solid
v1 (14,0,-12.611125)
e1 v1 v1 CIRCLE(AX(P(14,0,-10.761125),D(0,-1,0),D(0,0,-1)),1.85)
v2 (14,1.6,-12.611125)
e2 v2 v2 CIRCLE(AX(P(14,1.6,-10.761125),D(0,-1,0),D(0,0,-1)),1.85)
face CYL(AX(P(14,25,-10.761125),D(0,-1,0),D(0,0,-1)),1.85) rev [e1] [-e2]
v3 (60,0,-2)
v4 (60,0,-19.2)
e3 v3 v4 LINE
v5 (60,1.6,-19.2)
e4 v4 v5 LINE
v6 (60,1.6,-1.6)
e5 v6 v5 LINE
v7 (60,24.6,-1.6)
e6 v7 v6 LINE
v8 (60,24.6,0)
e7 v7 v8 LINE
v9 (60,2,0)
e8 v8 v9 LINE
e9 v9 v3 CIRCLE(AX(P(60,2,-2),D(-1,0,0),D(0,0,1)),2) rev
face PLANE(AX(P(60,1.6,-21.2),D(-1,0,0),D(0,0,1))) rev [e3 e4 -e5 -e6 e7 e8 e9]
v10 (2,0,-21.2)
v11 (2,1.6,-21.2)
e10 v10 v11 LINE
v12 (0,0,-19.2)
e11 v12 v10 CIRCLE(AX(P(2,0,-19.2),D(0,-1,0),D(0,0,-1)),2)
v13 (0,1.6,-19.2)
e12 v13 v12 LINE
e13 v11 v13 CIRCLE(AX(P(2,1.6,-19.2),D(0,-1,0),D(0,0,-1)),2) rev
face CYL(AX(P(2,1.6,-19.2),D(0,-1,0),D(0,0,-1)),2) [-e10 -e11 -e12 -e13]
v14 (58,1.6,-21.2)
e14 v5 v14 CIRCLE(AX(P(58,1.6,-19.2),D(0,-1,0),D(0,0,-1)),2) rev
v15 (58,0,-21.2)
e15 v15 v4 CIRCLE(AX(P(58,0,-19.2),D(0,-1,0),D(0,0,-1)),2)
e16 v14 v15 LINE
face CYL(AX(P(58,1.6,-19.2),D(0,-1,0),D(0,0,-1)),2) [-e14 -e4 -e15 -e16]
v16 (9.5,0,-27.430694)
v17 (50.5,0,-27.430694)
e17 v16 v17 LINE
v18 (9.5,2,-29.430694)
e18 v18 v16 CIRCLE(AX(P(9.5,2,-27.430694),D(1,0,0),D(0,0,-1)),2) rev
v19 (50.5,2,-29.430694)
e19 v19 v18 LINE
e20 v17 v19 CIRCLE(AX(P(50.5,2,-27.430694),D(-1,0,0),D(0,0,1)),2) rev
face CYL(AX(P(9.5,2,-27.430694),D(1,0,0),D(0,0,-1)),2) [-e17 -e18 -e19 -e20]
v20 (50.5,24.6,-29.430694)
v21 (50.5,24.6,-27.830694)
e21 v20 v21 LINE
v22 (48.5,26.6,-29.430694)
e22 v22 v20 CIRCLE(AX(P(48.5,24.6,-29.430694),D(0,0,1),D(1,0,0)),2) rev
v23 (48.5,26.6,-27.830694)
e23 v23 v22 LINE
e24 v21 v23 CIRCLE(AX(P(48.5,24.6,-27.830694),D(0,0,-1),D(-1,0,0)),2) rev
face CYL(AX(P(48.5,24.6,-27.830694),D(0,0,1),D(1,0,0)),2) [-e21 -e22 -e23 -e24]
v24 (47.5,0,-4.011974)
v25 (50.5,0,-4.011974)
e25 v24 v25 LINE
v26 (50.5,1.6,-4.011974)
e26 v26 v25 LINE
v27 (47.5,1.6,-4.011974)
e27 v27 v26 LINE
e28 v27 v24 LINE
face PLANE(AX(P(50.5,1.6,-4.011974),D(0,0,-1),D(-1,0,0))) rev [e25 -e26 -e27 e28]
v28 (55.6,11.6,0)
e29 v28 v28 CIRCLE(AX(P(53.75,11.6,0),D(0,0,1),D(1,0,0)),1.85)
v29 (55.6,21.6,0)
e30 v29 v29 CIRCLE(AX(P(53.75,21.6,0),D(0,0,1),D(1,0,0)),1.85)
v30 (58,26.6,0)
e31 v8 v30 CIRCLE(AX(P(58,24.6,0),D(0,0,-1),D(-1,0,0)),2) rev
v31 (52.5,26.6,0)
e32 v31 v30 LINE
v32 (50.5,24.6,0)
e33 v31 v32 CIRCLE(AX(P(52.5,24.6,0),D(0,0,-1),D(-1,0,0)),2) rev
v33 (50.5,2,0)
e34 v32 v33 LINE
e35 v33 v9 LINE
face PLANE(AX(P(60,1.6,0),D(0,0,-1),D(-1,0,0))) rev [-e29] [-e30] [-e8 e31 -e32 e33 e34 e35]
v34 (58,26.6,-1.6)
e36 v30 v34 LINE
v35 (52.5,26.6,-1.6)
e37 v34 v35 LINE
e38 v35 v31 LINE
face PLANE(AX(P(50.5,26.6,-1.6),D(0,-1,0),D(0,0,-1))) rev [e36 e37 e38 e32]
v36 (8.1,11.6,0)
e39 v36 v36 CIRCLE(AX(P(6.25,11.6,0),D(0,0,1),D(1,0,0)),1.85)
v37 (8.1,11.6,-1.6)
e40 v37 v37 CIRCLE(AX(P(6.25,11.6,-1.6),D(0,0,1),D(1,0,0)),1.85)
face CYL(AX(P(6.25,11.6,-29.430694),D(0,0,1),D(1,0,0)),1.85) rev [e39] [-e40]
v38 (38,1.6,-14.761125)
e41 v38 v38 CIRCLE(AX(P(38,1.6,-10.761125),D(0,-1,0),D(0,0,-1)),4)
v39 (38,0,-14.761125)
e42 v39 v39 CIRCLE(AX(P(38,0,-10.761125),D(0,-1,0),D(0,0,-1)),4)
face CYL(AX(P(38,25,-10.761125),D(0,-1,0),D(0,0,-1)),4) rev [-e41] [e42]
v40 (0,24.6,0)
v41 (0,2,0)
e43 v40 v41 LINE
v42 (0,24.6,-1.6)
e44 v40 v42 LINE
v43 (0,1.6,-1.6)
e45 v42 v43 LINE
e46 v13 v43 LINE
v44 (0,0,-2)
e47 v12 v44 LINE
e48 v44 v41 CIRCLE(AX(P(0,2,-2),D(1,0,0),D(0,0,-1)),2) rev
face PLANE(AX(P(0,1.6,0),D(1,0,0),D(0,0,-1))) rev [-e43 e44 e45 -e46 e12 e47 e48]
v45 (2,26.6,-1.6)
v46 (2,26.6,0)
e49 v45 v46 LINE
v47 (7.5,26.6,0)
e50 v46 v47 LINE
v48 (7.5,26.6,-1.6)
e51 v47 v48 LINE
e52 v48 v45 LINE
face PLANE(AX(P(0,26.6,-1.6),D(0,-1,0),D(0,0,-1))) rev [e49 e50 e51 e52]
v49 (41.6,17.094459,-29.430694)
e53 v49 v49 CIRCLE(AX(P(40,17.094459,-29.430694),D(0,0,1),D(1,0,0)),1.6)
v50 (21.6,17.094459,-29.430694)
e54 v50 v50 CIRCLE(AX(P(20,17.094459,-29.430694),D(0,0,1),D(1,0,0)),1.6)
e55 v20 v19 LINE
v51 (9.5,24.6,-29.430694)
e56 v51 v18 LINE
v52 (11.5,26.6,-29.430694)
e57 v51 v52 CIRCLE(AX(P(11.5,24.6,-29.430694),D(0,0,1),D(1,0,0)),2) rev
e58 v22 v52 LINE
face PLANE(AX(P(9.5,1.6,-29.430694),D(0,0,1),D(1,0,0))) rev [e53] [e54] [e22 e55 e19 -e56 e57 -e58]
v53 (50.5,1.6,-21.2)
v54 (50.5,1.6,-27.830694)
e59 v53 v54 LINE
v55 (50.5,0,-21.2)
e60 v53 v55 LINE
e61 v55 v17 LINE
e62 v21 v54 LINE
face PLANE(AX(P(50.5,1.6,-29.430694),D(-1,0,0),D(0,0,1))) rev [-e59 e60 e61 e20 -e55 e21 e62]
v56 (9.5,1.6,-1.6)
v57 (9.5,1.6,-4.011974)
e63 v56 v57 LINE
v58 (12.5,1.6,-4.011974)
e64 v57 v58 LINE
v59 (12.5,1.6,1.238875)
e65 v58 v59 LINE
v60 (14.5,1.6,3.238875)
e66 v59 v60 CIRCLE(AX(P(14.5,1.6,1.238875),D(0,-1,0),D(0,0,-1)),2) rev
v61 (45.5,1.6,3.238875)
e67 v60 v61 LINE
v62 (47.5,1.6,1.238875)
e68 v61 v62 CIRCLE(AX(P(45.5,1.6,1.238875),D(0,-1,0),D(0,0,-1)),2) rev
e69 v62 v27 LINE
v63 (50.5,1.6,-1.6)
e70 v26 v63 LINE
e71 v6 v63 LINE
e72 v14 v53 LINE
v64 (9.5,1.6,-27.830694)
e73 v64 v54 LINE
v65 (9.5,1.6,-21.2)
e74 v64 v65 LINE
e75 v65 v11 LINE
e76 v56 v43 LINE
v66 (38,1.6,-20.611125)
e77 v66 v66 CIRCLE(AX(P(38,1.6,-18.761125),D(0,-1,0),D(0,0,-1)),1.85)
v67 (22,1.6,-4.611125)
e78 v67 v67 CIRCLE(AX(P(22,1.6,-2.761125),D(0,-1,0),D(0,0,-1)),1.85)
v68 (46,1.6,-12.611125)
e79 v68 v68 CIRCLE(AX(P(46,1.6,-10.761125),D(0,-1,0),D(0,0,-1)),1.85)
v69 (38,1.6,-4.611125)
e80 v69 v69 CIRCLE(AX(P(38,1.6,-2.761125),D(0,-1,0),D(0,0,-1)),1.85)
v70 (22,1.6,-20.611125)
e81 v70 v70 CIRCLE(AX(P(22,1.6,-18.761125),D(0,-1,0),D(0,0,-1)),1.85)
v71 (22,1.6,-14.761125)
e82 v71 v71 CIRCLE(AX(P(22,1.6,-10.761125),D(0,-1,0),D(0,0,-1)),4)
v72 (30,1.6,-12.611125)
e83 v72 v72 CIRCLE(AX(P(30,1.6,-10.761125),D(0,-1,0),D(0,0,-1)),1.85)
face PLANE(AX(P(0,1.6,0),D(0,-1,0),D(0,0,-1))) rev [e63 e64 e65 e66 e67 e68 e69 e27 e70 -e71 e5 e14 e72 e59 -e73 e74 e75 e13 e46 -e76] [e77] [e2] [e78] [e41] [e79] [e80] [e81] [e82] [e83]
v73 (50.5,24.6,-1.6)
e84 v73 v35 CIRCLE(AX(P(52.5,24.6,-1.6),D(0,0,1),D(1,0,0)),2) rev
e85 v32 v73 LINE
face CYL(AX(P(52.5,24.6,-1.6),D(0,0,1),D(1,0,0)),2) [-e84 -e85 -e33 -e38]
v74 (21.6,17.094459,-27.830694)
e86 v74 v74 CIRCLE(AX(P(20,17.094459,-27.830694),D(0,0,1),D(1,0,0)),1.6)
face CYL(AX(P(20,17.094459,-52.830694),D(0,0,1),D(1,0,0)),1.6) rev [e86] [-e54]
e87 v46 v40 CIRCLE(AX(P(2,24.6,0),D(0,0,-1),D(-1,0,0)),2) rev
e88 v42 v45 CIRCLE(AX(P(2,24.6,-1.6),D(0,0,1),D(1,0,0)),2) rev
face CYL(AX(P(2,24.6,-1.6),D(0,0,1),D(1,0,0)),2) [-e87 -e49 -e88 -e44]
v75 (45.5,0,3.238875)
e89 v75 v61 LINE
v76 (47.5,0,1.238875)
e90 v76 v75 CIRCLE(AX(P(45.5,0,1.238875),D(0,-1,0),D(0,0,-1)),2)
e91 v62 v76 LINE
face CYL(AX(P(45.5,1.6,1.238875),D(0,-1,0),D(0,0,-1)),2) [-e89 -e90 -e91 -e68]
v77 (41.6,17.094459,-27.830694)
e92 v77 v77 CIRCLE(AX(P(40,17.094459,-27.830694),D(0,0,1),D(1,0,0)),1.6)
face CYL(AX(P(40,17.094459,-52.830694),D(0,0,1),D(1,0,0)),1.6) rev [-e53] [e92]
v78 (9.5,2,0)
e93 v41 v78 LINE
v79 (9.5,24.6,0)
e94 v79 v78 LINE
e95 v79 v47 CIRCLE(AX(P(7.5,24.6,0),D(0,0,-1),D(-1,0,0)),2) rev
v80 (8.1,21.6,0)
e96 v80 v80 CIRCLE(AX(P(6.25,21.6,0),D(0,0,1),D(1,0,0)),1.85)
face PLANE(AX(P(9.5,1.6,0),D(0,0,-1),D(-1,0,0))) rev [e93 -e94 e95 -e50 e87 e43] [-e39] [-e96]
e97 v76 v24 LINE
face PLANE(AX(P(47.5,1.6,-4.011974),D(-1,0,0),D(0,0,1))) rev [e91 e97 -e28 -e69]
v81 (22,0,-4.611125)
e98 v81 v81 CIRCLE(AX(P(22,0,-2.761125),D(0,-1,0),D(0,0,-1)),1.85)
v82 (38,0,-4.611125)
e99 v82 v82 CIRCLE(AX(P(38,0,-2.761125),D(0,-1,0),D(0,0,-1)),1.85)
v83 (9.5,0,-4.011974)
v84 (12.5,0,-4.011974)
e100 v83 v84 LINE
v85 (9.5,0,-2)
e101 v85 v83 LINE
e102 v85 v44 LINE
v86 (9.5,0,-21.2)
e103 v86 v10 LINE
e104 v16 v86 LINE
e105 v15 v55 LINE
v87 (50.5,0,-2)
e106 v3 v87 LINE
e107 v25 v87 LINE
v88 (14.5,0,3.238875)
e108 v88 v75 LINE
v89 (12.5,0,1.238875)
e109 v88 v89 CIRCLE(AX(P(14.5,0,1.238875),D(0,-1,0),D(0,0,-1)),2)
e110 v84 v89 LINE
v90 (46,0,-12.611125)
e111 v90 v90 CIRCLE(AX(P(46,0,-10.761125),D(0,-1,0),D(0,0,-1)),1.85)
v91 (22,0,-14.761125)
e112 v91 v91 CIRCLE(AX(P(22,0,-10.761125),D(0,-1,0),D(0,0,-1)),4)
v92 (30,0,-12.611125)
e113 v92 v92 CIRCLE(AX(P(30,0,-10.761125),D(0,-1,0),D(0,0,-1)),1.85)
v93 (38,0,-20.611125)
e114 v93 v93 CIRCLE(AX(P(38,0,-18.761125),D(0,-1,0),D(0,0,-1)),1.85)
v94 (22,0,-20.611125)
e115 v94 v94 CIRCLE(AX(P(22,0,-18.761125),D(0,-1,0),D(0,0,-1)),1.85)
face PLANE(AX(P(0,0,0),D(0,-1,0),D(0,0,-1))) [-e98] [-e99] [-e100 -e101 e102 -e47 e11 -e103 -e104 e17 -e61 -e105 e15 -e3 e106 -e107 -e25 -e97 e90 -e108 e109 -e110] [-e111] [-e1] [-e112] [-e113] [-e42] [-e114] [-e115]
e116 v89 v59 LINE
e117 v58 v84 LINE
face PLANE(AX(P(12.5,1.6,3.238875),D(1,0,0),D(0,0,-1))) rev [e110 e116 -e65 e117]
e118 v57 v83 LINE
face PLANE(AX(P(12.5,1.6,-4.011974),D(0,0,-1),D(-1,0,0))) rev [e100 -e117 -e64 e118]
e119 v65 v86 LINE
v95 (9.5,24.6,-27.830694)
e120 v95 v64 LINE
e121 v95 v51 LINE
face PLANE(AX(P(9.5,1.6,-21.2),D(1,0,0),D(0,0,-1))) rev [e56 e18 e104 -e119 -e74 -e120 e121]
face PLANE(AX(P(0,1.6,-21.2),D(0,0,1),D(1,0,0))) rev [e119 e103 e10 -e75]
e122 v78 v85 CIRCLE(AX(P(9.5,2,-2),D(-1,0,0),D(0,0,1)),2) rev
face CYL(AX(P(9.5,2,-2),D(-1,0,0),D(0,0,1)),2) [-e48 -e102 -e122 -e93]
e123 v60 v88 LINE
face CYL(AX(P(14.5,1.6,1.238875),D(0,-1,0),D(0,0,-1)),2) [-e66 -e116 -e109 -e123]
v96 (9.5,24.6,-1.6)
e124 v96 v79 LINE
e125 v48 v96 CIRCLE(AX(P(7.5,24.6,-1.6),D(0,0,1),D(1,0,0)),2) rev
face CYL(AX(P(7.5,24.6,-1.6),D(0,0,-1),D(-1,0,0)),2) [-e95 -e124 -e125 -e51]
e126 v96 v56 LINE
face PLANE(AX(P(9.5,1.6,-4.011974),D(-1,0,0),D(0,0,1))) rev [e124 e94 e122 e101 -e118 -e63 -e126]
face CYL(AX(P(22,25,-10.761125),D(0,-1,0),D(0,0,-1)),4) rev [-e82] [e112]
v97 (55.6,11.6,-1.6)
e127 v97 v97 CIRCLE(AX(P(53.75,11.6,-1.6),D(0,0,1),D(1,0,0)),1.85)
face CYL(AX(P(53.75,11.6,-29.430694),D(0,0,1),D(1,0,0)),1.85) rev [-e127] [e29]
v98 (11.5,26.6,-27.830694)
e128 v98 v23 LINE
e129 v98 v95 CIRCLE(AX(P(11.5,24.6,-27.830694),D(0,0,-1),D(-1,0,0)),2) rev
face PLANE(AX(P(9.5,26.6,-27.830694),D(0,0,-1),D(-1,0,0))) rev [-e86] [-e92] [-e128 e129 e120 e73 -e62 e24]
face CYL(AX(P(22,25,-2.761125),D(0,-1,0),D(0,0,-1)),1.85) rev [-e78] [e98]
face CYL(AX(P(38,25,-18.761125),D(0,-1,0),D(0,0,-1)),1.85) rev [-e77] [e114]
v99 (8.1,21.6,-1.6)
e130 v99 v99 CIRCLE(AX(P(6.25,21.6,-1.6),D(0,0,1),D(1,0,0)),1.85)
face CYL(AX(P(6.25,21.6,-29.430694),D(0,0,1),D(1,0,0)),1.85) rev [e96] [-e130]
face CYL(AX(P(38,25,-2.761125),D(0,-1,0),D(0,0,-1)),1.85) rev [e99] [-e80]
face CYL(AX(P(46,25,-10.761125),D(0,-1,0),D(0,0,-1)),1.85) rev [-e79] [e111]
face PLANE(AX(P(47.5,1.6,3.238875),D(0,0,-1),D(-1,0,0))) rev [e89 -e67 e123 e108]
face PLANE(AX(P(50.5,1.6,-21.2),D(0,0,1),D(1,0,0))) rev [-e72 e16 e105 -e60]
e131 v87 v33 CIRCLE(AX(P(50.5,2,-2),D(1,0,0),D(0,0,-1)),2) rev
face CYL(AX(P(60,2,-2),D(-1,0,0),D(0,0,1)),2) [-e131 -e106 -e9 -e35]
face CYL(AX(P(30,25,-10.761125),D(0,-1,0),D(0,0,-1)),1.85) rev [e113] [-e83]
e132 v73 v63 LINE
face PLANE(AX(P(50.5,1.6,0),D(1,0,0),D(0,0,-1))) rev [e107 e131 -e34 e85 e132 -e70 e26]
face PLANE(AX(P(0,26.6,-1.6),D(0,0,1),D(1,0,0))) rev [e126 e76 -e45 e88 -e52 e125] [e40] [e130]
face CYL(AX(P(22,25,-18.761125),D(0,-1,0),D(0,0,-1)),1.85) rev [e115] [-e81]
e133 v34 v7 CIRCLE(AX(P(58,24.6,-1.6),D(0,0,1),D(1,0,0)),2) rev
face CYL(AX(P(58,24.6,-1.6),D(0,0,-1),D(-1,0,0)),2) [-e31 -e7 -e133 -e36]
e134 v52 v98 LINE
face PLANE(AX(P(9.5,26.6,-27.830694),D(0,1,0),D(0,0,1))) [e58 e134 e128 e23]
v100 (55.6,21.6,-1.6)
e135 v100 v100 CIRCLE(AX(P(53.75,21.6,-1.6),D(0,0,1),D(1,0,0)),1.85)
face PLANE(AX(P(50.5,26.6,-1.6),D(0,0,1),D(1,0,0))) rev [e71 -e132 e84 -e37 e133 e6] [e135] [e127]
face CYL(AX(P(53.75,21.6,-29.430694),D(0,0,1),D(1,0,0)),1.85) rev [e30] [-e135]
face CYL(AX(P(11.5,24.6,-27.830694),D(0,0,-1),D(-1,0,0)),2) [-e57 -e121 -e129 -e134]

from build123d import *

# Parameters (mm, degrees)
EXTRUDE1_DEPTH           = 1.6
SKETCH2_W                = 9.5
SKETCH2_H                = 1.6
SKETCH2_W_2              = 41
EXTRUDE2_DEPTH           = 25
SKETCH3_R                = 1.85
CUT_EXTRUDE1_DEPTH       = 72.928615584
SKETCH4_R                = 1.6
CUT_EXTRUDE2_DEPTH       = 25
CUT_EXTRUDE3_START       = -1.6
CUT_EXTRUDE3_OUTLINE_R   = 1.85
CUT_EXTRUDE3_OUTLINE_R_2 = 4
CUT_EXTRUDE3_DEPTH       = 1.6
FILLET1_R                = 2
FILLET2_R                = 2
FILLET3_R                = 2
FILLET4_R                = 2
FILLET5_R                = 2
FILLET6_R                = 2
FILLET7_R                = 2
FILLET8_R                = 2
FILLET9_R                = 2
FILLET10_R               = 2
FILLET11_R               = 2
FILLET12_R               = 2
FILLET13_R               = 2


# Read off the part's stored shape, not the designer's step: Cut-Extrude3
with BuildPart() as part:
    # Sketch1 → Extrude1 (new body)
    with BuildSketch(Plane(origin=(0, 0, 0), x_dir=(1, 0, 0), z_dir=(0, 1, 0))):
        Polygon((0, 0), (0, 21.2), (9.5, 21.2), (9.5, 29.43069384), (50.5, 29.43069384), (50.5, 21.2), (60, 21.2), (60, 0), (50.5, 0), (50.5, 4.011974119), (47.5, 4.011974119), (47.5, -3.238875216), (12.5, -3.238875216), (12.5, 4.011974119), (9.5, 4.011974119), (9.5, 0), align=None)
    extrude(amount=EXTRUDE1_DEPTH)

    # Sketch2 → Extrude2 (add)
    with BuildSketch(Plane(origin=(0, 1.6, 0), x_dir=(1, 0, 0), z_dir=(0, 1, 0))):
        with Locations((4.75, 0.8)):
            Rectangle(SKETCH2_W, SKETCH2_H)
        with Locations((55.25, 0.8)):
            Rectangle(SKETCH2_W, SKETCH2_H)
        with Locations((30, 28.63069384)):
            Rectangle(SKETCH2_W_2, SKETCH2_H)
    extrude(amount=EXTRUDE2_DEPTH)

    # Sketch3 → Cut-Extrude1 (cut, through all)
    with BuildSketch(Plane.XY):
        with Locations((6.25, 21.6)):
            Circle(SKETCH3_R)
        with Locations((6.25, 11.6)):
            Circle(SKETCH3_R)
        with Locations((53.75, 21.6)):
            Circle(SKETCH3_R)
        with Locations((53.75, 11.6)):
            Circle(SKETCH3_R)
    extrude(amount=-CUT_EXTRUDE1_DEPTH, mode=Mode.SUBTRACT)

    # Sketch4 → Cut-Extrude2 (cut)
    with BuildSketch(Plane.XY.offset(-27.83069384)):
        with Locations((20, 17.094459231)):
            Circle(SKETCH4_R)
        with Locations((40, 17.094459231)):
            Circle(SKETCH4_R)
    extrude(amount=-CUT_EXTRUDE2_DEPTH, mode=Mode.SUBTRACT)

    # Cut-Extrude3 outline → Cut-Extrude3 (cut)
    with BuildSketch(Plane.XZ.offset(CUT_EXTRUDE3_START)):
        with Locations((14, -10.761124784)):
            Circle(CUT_EXTRUDE3_OUTLINE_R)
        with Locations((22, -10.761124784)):
            Circle(CUT_EXTRUDE3_OUTLINE_R_2)
        with Locations((30, -10.761124784)):
            Circle(CUT_EXTRUDE3_OUTLINE_R)
        with Locations((22, -18.761124784)):
            Circle(CUT_EXTRUDE3_OUTLINE_R)
        with Locations((22, -2.761124784)):
            Circle(CUT_EXTRUDE3_OUTLINE_R)
        with Locations((38, -10.761124784)):
            Circle(CUT_EXTRUDE3_OUTLINE_R_2)
        with Locations((46, -10.761124784)):
            Circle(CUT_EXTRUDE3_OUTLINE_R)
        with Locations((38, -18.761124784)):
            Circle(CUT_EXTRUDE3_OUTLINE_R)
        with Locations((38, -2.761124784)):
            Circle(CUT_EXTRUDE3_OUTLINE_R)
    extrude(amount=CUT_EXTRUDE3_DEPTH, mode=Mode.SUBTRACT)

    # Fillet1
    fillet1_edges = [part.edges().sort_by_distance(p)[0] for p in [
        (47.5, 0.8, 3.238875216),
    ]]
    fillet(fillet1_edges, radius=FILLET1_R)

    # Fillet2
    fillet2_edges = [part.edges().sort_by_distance(p)[0] for p in [
        (12.5, 0.8, 3.238875216),
    ]]
    fillet(fillet2_edges, radius=FILLET2_R)

    # Fillet3
    fillet3_edges = [part.edges().sort_by_distance(p)[0] for p in [
        (60, 26.6, -0.8),
    ]]
    fillet(fillet3_edges, radius=FILLET3_R)

    # Fillet4
    fillet4_edges = [part.edges().sort_by_distance(p)[0] for p in [
        (9.5, 26.6, -0.8),
    ]]
    fillet(fillet4_edges, radius=FILLET4_R)

    # Fillet5
    fillet5_edges = [part.edges().sort_by_distance(p)[0] for p in [
        (50.5, 26.6, -28.63069384),
    ]]
    fillet(fillet5_edges, radius=FILLET5_R)

    # Fillet6
    fillet6_edges = [part.edges().sort_by_distance(p)[0] for p in [
        (50.5, 26.6, -0.8),
    ]]
    fillet(fillet6_edges, radius=FILLET6_R)

    # Fillet7
    fillet7_edges = [part.edges().sort_by_distance(p)[0] for p in [
        (0, 26.6, -0.8),
    ]]
    fillet(fillet7_edges, radius=FILLET7_R)

    # Fillet8
    fillet8_edges = [part.edges().sort_by_distance(p)[0] for p in [
        (9.5, 26.6, -28.63069384),
    ]]
    fillet(fillet8_edges, radius=FILLET8_R)

    # Fillet9
    fillet9_edges = [part.edges().sort_by_distance(p)[0] for p in [
        (0, 0.8, -21.2),
    ]]
    fillet(fillet9_edges, radius=FILLET9_R)

    # Fillet10
    fillet10_edges = [part.edges().sort_by_distance(p)[0] for p in [
        (60, 0.8, -21.2),
    ]]
    fillet(fillet10_edges, radius=FILLET10_R)

    # Fillet11
    fillet11_edges = [part.edges().sort_by_distance(p)[0] for p in [
        (30, 0, -29.43069384),
    ]]
    fillet(fillet11_edges, radius=FILLET11_R)

    # Fillet12
    fillet12_edges = [part.edges().sort_by_distance(p)[0] for p in [
        (55.25, 0, 0),
    ]]
    fillet(fillet12_edges, radius=FILLET12_R)

    # Fillet13
    fillet13_edges = [part.edges().sort_by_distance(p)[0] for p in [
        (4.75, 0, 0),
    ]]
    fillet(fillet13_edges, radius=FILLET13_R)


solid = part.part
